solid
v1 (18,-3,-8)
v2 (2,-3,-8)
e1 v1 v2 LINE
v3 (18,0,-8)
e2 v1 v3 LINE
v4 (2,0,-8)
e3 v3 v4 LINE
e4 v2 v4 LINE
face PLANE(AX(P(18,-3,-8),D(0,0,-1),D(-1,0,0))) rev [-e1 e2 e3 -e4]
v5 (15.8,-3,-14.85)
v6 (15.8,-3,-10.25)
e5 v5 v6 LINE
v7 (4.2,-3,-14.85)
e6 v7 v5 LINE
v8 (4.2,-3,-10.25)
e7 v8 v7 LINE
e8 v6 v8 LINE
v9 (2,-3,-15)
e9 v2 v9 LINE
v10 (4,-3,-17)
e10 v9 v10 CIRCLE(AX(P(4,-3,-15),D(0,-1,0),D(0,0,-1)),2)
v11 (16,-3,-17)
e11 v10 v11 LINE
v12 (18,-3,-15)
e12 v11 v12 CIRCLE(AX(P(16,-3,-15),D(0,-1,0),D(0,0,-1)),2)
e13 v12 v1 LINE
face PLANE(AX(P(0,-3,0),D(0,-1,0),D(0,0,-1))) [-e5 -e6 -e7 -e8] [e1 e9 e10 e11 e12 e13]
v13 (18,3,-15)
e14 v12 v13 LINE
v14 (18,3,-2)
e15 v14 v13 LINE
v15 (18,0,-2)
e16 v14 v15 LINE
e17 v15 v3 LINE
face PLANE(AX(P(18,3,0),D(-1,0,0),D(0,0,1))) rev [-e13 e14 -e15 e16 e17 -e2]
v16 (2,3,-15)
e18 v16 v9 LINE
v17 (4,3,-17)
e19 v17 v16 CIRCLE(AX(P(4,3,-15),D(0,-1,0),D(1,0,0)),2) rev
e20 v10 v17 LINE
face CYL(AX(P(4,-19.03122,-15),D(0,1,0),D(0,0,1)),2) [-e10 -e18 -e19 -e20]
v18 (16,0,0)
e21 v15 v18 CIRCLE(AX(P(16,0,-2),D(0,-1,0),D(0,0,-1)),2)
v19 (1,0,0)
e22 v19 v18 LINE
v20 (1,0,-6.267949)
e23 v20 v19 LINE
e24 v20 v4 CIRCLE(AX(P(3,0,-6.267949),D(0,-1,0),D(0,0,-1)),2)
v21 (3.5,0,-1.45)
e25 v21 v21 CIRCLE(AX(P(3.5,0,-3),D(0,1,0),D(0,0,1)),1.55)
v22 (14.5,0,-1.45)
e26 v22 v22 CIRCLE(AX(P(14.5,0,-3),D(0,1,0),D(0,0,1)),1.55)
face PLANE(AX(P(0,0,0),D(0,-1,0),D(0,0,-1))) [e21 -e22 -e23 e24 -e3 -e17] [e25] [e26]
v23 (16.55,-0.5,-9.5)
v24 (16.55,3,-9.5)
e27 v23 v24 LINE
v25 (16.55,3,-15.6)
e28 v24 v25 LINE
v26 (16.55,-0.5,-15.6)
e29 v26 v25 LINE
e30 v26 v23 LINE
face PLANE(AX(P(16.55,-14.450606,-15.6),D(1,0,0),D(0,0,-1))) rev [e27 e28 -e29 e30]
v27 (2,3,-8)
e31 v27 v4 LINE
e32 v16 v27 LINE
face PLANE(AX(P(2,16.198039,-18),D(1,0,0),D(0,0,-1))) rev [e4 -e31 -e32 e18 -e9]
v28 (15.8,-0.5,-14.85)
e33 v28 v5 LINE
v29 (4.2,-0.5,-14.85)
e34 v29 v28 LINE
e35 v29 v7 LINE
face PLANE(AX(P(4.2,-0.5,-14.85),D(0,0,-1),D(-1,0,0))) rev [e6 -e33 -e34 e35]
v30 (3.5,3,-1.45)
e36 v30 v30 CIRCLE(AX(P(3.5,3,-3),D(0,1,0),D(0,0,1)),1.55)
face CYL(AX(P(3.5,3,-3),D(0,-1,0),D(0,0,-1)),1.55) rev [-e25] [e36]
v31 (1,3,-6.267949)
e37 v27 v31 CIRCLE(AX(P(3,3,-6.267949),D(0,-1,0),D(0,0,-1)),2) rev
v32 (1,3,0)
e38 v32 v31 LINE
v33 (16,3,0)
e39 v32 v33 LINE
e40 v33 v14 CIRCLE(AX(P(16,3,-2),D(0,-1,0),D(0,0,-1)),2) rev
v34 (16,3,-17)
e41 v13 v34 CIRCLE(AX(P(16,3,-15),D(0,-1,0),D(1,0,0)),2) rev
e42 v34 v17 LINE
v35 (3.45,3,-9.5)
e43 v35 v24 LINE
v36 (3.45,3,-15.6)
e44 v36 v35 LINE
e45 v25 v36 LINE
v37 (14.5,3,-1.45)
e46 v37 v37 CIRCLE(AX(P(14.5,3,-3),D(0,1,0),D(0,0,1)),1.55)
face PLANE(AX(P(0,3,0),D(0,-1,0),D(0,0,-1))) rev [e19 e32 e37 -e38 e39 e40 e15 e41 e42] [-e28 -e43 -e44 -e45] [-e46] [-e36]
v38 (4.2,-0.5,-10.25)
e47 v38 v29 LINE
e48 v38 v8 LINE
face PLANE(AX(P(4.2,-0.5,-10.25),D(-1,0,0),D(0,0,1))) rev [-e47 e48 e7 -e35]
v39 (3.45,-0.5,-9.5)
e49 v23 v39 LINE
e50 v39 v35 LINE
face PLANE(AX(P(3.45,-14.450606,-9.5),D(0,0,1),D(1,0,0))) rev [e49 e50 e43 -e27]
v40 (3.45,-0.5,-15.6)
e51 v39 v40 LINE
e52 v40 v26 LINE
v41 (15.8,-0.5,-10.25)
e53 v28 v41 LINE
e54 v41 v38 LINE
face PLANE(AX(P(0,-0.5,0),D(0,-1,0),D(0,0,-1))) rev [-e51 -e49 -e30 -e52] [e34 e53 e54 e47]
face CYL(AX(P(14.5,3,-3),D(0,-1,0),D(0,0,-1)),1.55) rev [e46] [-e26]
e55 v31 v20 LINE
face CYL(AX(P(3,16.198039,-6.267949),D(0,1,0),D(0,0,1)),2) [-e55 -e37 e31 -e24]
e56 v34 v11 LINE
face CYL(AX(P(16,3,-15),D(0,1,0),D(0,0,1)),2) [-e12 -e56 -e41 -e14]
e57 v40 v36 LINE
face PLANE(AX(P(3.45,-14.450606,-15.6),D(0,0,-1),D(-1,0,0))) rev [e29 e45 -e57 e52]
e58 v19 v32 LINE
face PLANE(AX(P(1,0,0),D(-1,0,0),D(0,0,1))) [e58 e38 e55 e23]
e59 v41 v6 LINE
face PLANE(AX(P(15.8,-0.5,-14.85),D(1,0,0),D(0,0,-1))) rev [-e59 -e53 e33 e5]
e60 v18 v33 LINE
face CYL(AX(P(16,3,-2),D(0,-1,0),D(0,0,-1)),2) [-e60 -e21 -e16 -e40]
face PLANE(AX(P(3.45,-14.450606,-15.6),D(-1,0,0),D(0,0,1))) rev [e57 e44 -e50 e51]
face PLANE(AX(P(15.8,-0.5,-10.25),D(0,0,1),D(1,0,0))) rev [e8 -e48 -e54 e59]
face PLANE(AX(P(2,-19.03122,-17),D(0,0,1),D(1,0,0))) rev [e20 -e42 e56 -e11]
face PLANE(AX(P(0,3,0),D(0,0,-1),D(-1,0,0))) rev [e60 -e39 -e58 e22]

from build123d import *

# Parameters (mm, degrees)
CROQUIS1_W              = 18
CROQUIS1_H              = 18
CROQUIS1_R              = 1.55
SALIENTE_EXTRUIR1_DEPTH = 3
CROQUIS3_W              = 18
CROQUIS3_H              = 10
SALIENTE_EXTRUIR3_DEPTH = 3
CORTAR_EXTRUIR1_REACH   = 28.153
CROQUIS4_W              = 2
CROQUIS4_H              = 10
CROQUIS7_W              = 13.1
CROQUIS7_H              = 6.1
CORTAR_EXTRUIR2_DEPTH   = 6
CROQUIS9_W              = 16
CROQUIS9_H              = 10
CROQUIS9_W_2            = 13.1
CROQUIS9_H_2            = 6.1
SALIENTE_EXTRUIR4_DEPTH = 3
CROQUIS10_W             = 13.1
CROQUIS10_H             = 6.1
CROQUIS10_W_2           = 11.6
CROQUIS10_H_2           = 4.6
SALIENTE_EXTRUIR6_DEPTH = 2.5
CROQUIS11_W             = 16
CROQUIS11_H             = 1
CORTAR_EXTRUIR4_DEPTH   = 9
REDONDEO1_R             = 2
CROQUIS12_W             = 8
CROQUIS12_H             = 3
CORTAR_EXTRUIR5_DEPTH   = 1
CROQUIS14_W             = 16
CROQUIS14_H             = 3
CORTAR_EXTRUIR6_DEPTH   = 9
REDONDEO2_R             = 2


with BuildPart() as part:
    # Croquis1 → Saliente-Extruir1 (new body)
    with BuildSketch(Plane(origin=(0, 0, 0), x_dir=(1, 0, 0), z_dir=(0, 1, 0))):
        with Locations((9, 9)):
            Rectangle(CROQUIS1_W, CROQUIS1_H)
        with Locations(Location((3.5, 3, 0), (0, 0, 270))):
            Circle(CROQUIS1_R, mode=Mode.SUBTRACT)
        with Locations(Location((14.5, 3, 0), (0, 0, 270))):
            Circle(CROQUIS1_R, mode=Mode.SUBTRACT)
    extrude(amount=SALIENTE_EXTRUIR1_DEPTH)

    # Croquis3 → Saliente-Extruir3 (add)
    with BuildSketch(Plane(origin=(0, 3, 0), x_dir=(1, 0, 0), z_dir=(0, 1, 0))):
        with Locations((9, 13)):
            Rectangle(CROQUIS3_W, CROQUIS3_H)
    extrude(amount=SALIENTE_EXTRUIR3_DEPTH)

    # Cortar-Extruir1: up to this face of the body (flat: up to its plane)
    cortar_extruir1_end = Plane(part.part.faces().sort_by_distance((9, 6, -13))[0])
    # Croquis4 → Cortar-Extruir1 (cut, up to the picked face)
    with BuildSketch(Plane.XZ, mode=Mode.PRIVATE) as cortar_extruir1_sk1:
        with Locations((1, -13)):
            Rectangle(CROQUIS4_W, CROQUIS4_H)
    cortar_extruir1_tool1 = split(extrude(cortar_extruir1_sk1.sketch, amount=-CORTAR_EXTRUIR1_REACH, mode=Mode.PRIVATE), bisect_by=cortar_extruir1_end, keep=Keep.BOTH, mode=Mode.PRIVATE)
    add(cortar_extruir1_tool1.solids().sort_by(Axis((1, 0, -13), (0, 1, 0)))[0], mode=Mode.SUBTRACT)

    # Croquis7 → Cortar-Extruir2 (cut)
    with BuildSketch(Plane(origin=(0, 6, 0), x_dir=(1, 0, 0), z_dir=(0, 1, 0))):
        with Locations((10, 12.55)):
            Rectangle(CROQUIS7_W, CROQUIS7_H)
    extrude(amount=-CORTAR_EXTRUIR2_DEPTH, mode=Mode.SUBTRACT)

    # Croquis9 → Saliente-Extruir4 (add)
    with BuildSketch(Plane.XZ):
        with Locations((10, -13)):
            Rectangle(CROQUIS9_W, CROQUIS9_H)
        with Locations((10, -12.55)):
            Rectangle(CROQUIS9_W_2, CROQUIS9_H_2, mode=Mode.SUBTRACT)
    extrude(amount=SALIENTE_EXTRUIR4_DEPTH)

    # Croquis10 → Saliente-Extruir6 (add)
    with BuildSketch(Plane.XZ.offset(3)):
        with Locations((10, -12.55)):
            Rectangle(CROQUIS10_W, CROQUIS10_H)
        with Locations((10, -12.55)):
            Rectangle(CROQUIS10_W_2, CROQUIS10_H_2, mode=Mode.SUBTRACT)
    extrude(amount=-SALIENTE_EXTRUIR6_DEPTH)

    # Croquis11 → Cortar-Extruir4 (cut)
    with BuildSketch(Plane(origin=(0, 6, 0), x_dir=(1, 0, 0), z_dir=(0, 1, 0))):
        with Locations((10, 17.5)):
            Rectangle(CROQUIS11_W, CROQUIS11_H)
    extrude(amount=-CORTAR_EXTRUIR4_DEPTH, mode=Mode.SUBTRACT)

    # Redondeo1
    redondeo1_edges = [part.edges().sort_by_distance(p)[0] for p in [
        (18, 1.5, -17),
        (2, 1.5, -17),
        (18, 1.5, 0),
    ]]
    fillet(redondeo1_edges, radius=REDONDEO1_R)

    # Croquis12 → Cortar-Extruir5 (cut)
    with BuildSketch(Plane.ZY):
        with Locations((-4, 1.5)):
            Rectangle(CROQUIS12_W, CROQUIS12_H)
    extrude(amount=-CORTAR_EXTRUIR5_DEPTH, mode=Mode.SUBTRACT)

    # Croquis14 → Cortar-Extruir6 (cut)
    with BuildSketch(Plane.XY.offset(-8)):
        with Locations((10, 4.5)):
            Rectangle(CROQUIS14_W, CROQUIS14_H)
    extrude(amount=-CORTAR_EXTRUIR6_DEPTH, mode=Mode.SUBTRACT)

    # Redondeo2
    # the kernel refuses this fillet: 2 mm, written as the material it takes off along each edge
    with BuildSketch(Plane(origin=(1, 7.330127019, -8), x_dir=(0, 0, 1), z_dir=(0, -1, 0))) as redondeo2_piece_1:
        with BuildLine():
            CenterArc((1.732050808, -2), REDONDEO2_R, 90, 60)
            Line((0, -1), (-0.034641016, -0.98))
            ThreePointArc((-0.034641016, -0.98), (-0.04, -0.5), (-0.04, 0))
            Line((-0.04, 0), (0, 0.04))
            Line((0, 0.04), (1.732050808, 0.04))
            Line((1.732050808, 0.04), (1.732050808, 0))
        make_face()
    extrude(amount=11.660254038, mode=Mode.SUBTRACT)


solid = part.part
